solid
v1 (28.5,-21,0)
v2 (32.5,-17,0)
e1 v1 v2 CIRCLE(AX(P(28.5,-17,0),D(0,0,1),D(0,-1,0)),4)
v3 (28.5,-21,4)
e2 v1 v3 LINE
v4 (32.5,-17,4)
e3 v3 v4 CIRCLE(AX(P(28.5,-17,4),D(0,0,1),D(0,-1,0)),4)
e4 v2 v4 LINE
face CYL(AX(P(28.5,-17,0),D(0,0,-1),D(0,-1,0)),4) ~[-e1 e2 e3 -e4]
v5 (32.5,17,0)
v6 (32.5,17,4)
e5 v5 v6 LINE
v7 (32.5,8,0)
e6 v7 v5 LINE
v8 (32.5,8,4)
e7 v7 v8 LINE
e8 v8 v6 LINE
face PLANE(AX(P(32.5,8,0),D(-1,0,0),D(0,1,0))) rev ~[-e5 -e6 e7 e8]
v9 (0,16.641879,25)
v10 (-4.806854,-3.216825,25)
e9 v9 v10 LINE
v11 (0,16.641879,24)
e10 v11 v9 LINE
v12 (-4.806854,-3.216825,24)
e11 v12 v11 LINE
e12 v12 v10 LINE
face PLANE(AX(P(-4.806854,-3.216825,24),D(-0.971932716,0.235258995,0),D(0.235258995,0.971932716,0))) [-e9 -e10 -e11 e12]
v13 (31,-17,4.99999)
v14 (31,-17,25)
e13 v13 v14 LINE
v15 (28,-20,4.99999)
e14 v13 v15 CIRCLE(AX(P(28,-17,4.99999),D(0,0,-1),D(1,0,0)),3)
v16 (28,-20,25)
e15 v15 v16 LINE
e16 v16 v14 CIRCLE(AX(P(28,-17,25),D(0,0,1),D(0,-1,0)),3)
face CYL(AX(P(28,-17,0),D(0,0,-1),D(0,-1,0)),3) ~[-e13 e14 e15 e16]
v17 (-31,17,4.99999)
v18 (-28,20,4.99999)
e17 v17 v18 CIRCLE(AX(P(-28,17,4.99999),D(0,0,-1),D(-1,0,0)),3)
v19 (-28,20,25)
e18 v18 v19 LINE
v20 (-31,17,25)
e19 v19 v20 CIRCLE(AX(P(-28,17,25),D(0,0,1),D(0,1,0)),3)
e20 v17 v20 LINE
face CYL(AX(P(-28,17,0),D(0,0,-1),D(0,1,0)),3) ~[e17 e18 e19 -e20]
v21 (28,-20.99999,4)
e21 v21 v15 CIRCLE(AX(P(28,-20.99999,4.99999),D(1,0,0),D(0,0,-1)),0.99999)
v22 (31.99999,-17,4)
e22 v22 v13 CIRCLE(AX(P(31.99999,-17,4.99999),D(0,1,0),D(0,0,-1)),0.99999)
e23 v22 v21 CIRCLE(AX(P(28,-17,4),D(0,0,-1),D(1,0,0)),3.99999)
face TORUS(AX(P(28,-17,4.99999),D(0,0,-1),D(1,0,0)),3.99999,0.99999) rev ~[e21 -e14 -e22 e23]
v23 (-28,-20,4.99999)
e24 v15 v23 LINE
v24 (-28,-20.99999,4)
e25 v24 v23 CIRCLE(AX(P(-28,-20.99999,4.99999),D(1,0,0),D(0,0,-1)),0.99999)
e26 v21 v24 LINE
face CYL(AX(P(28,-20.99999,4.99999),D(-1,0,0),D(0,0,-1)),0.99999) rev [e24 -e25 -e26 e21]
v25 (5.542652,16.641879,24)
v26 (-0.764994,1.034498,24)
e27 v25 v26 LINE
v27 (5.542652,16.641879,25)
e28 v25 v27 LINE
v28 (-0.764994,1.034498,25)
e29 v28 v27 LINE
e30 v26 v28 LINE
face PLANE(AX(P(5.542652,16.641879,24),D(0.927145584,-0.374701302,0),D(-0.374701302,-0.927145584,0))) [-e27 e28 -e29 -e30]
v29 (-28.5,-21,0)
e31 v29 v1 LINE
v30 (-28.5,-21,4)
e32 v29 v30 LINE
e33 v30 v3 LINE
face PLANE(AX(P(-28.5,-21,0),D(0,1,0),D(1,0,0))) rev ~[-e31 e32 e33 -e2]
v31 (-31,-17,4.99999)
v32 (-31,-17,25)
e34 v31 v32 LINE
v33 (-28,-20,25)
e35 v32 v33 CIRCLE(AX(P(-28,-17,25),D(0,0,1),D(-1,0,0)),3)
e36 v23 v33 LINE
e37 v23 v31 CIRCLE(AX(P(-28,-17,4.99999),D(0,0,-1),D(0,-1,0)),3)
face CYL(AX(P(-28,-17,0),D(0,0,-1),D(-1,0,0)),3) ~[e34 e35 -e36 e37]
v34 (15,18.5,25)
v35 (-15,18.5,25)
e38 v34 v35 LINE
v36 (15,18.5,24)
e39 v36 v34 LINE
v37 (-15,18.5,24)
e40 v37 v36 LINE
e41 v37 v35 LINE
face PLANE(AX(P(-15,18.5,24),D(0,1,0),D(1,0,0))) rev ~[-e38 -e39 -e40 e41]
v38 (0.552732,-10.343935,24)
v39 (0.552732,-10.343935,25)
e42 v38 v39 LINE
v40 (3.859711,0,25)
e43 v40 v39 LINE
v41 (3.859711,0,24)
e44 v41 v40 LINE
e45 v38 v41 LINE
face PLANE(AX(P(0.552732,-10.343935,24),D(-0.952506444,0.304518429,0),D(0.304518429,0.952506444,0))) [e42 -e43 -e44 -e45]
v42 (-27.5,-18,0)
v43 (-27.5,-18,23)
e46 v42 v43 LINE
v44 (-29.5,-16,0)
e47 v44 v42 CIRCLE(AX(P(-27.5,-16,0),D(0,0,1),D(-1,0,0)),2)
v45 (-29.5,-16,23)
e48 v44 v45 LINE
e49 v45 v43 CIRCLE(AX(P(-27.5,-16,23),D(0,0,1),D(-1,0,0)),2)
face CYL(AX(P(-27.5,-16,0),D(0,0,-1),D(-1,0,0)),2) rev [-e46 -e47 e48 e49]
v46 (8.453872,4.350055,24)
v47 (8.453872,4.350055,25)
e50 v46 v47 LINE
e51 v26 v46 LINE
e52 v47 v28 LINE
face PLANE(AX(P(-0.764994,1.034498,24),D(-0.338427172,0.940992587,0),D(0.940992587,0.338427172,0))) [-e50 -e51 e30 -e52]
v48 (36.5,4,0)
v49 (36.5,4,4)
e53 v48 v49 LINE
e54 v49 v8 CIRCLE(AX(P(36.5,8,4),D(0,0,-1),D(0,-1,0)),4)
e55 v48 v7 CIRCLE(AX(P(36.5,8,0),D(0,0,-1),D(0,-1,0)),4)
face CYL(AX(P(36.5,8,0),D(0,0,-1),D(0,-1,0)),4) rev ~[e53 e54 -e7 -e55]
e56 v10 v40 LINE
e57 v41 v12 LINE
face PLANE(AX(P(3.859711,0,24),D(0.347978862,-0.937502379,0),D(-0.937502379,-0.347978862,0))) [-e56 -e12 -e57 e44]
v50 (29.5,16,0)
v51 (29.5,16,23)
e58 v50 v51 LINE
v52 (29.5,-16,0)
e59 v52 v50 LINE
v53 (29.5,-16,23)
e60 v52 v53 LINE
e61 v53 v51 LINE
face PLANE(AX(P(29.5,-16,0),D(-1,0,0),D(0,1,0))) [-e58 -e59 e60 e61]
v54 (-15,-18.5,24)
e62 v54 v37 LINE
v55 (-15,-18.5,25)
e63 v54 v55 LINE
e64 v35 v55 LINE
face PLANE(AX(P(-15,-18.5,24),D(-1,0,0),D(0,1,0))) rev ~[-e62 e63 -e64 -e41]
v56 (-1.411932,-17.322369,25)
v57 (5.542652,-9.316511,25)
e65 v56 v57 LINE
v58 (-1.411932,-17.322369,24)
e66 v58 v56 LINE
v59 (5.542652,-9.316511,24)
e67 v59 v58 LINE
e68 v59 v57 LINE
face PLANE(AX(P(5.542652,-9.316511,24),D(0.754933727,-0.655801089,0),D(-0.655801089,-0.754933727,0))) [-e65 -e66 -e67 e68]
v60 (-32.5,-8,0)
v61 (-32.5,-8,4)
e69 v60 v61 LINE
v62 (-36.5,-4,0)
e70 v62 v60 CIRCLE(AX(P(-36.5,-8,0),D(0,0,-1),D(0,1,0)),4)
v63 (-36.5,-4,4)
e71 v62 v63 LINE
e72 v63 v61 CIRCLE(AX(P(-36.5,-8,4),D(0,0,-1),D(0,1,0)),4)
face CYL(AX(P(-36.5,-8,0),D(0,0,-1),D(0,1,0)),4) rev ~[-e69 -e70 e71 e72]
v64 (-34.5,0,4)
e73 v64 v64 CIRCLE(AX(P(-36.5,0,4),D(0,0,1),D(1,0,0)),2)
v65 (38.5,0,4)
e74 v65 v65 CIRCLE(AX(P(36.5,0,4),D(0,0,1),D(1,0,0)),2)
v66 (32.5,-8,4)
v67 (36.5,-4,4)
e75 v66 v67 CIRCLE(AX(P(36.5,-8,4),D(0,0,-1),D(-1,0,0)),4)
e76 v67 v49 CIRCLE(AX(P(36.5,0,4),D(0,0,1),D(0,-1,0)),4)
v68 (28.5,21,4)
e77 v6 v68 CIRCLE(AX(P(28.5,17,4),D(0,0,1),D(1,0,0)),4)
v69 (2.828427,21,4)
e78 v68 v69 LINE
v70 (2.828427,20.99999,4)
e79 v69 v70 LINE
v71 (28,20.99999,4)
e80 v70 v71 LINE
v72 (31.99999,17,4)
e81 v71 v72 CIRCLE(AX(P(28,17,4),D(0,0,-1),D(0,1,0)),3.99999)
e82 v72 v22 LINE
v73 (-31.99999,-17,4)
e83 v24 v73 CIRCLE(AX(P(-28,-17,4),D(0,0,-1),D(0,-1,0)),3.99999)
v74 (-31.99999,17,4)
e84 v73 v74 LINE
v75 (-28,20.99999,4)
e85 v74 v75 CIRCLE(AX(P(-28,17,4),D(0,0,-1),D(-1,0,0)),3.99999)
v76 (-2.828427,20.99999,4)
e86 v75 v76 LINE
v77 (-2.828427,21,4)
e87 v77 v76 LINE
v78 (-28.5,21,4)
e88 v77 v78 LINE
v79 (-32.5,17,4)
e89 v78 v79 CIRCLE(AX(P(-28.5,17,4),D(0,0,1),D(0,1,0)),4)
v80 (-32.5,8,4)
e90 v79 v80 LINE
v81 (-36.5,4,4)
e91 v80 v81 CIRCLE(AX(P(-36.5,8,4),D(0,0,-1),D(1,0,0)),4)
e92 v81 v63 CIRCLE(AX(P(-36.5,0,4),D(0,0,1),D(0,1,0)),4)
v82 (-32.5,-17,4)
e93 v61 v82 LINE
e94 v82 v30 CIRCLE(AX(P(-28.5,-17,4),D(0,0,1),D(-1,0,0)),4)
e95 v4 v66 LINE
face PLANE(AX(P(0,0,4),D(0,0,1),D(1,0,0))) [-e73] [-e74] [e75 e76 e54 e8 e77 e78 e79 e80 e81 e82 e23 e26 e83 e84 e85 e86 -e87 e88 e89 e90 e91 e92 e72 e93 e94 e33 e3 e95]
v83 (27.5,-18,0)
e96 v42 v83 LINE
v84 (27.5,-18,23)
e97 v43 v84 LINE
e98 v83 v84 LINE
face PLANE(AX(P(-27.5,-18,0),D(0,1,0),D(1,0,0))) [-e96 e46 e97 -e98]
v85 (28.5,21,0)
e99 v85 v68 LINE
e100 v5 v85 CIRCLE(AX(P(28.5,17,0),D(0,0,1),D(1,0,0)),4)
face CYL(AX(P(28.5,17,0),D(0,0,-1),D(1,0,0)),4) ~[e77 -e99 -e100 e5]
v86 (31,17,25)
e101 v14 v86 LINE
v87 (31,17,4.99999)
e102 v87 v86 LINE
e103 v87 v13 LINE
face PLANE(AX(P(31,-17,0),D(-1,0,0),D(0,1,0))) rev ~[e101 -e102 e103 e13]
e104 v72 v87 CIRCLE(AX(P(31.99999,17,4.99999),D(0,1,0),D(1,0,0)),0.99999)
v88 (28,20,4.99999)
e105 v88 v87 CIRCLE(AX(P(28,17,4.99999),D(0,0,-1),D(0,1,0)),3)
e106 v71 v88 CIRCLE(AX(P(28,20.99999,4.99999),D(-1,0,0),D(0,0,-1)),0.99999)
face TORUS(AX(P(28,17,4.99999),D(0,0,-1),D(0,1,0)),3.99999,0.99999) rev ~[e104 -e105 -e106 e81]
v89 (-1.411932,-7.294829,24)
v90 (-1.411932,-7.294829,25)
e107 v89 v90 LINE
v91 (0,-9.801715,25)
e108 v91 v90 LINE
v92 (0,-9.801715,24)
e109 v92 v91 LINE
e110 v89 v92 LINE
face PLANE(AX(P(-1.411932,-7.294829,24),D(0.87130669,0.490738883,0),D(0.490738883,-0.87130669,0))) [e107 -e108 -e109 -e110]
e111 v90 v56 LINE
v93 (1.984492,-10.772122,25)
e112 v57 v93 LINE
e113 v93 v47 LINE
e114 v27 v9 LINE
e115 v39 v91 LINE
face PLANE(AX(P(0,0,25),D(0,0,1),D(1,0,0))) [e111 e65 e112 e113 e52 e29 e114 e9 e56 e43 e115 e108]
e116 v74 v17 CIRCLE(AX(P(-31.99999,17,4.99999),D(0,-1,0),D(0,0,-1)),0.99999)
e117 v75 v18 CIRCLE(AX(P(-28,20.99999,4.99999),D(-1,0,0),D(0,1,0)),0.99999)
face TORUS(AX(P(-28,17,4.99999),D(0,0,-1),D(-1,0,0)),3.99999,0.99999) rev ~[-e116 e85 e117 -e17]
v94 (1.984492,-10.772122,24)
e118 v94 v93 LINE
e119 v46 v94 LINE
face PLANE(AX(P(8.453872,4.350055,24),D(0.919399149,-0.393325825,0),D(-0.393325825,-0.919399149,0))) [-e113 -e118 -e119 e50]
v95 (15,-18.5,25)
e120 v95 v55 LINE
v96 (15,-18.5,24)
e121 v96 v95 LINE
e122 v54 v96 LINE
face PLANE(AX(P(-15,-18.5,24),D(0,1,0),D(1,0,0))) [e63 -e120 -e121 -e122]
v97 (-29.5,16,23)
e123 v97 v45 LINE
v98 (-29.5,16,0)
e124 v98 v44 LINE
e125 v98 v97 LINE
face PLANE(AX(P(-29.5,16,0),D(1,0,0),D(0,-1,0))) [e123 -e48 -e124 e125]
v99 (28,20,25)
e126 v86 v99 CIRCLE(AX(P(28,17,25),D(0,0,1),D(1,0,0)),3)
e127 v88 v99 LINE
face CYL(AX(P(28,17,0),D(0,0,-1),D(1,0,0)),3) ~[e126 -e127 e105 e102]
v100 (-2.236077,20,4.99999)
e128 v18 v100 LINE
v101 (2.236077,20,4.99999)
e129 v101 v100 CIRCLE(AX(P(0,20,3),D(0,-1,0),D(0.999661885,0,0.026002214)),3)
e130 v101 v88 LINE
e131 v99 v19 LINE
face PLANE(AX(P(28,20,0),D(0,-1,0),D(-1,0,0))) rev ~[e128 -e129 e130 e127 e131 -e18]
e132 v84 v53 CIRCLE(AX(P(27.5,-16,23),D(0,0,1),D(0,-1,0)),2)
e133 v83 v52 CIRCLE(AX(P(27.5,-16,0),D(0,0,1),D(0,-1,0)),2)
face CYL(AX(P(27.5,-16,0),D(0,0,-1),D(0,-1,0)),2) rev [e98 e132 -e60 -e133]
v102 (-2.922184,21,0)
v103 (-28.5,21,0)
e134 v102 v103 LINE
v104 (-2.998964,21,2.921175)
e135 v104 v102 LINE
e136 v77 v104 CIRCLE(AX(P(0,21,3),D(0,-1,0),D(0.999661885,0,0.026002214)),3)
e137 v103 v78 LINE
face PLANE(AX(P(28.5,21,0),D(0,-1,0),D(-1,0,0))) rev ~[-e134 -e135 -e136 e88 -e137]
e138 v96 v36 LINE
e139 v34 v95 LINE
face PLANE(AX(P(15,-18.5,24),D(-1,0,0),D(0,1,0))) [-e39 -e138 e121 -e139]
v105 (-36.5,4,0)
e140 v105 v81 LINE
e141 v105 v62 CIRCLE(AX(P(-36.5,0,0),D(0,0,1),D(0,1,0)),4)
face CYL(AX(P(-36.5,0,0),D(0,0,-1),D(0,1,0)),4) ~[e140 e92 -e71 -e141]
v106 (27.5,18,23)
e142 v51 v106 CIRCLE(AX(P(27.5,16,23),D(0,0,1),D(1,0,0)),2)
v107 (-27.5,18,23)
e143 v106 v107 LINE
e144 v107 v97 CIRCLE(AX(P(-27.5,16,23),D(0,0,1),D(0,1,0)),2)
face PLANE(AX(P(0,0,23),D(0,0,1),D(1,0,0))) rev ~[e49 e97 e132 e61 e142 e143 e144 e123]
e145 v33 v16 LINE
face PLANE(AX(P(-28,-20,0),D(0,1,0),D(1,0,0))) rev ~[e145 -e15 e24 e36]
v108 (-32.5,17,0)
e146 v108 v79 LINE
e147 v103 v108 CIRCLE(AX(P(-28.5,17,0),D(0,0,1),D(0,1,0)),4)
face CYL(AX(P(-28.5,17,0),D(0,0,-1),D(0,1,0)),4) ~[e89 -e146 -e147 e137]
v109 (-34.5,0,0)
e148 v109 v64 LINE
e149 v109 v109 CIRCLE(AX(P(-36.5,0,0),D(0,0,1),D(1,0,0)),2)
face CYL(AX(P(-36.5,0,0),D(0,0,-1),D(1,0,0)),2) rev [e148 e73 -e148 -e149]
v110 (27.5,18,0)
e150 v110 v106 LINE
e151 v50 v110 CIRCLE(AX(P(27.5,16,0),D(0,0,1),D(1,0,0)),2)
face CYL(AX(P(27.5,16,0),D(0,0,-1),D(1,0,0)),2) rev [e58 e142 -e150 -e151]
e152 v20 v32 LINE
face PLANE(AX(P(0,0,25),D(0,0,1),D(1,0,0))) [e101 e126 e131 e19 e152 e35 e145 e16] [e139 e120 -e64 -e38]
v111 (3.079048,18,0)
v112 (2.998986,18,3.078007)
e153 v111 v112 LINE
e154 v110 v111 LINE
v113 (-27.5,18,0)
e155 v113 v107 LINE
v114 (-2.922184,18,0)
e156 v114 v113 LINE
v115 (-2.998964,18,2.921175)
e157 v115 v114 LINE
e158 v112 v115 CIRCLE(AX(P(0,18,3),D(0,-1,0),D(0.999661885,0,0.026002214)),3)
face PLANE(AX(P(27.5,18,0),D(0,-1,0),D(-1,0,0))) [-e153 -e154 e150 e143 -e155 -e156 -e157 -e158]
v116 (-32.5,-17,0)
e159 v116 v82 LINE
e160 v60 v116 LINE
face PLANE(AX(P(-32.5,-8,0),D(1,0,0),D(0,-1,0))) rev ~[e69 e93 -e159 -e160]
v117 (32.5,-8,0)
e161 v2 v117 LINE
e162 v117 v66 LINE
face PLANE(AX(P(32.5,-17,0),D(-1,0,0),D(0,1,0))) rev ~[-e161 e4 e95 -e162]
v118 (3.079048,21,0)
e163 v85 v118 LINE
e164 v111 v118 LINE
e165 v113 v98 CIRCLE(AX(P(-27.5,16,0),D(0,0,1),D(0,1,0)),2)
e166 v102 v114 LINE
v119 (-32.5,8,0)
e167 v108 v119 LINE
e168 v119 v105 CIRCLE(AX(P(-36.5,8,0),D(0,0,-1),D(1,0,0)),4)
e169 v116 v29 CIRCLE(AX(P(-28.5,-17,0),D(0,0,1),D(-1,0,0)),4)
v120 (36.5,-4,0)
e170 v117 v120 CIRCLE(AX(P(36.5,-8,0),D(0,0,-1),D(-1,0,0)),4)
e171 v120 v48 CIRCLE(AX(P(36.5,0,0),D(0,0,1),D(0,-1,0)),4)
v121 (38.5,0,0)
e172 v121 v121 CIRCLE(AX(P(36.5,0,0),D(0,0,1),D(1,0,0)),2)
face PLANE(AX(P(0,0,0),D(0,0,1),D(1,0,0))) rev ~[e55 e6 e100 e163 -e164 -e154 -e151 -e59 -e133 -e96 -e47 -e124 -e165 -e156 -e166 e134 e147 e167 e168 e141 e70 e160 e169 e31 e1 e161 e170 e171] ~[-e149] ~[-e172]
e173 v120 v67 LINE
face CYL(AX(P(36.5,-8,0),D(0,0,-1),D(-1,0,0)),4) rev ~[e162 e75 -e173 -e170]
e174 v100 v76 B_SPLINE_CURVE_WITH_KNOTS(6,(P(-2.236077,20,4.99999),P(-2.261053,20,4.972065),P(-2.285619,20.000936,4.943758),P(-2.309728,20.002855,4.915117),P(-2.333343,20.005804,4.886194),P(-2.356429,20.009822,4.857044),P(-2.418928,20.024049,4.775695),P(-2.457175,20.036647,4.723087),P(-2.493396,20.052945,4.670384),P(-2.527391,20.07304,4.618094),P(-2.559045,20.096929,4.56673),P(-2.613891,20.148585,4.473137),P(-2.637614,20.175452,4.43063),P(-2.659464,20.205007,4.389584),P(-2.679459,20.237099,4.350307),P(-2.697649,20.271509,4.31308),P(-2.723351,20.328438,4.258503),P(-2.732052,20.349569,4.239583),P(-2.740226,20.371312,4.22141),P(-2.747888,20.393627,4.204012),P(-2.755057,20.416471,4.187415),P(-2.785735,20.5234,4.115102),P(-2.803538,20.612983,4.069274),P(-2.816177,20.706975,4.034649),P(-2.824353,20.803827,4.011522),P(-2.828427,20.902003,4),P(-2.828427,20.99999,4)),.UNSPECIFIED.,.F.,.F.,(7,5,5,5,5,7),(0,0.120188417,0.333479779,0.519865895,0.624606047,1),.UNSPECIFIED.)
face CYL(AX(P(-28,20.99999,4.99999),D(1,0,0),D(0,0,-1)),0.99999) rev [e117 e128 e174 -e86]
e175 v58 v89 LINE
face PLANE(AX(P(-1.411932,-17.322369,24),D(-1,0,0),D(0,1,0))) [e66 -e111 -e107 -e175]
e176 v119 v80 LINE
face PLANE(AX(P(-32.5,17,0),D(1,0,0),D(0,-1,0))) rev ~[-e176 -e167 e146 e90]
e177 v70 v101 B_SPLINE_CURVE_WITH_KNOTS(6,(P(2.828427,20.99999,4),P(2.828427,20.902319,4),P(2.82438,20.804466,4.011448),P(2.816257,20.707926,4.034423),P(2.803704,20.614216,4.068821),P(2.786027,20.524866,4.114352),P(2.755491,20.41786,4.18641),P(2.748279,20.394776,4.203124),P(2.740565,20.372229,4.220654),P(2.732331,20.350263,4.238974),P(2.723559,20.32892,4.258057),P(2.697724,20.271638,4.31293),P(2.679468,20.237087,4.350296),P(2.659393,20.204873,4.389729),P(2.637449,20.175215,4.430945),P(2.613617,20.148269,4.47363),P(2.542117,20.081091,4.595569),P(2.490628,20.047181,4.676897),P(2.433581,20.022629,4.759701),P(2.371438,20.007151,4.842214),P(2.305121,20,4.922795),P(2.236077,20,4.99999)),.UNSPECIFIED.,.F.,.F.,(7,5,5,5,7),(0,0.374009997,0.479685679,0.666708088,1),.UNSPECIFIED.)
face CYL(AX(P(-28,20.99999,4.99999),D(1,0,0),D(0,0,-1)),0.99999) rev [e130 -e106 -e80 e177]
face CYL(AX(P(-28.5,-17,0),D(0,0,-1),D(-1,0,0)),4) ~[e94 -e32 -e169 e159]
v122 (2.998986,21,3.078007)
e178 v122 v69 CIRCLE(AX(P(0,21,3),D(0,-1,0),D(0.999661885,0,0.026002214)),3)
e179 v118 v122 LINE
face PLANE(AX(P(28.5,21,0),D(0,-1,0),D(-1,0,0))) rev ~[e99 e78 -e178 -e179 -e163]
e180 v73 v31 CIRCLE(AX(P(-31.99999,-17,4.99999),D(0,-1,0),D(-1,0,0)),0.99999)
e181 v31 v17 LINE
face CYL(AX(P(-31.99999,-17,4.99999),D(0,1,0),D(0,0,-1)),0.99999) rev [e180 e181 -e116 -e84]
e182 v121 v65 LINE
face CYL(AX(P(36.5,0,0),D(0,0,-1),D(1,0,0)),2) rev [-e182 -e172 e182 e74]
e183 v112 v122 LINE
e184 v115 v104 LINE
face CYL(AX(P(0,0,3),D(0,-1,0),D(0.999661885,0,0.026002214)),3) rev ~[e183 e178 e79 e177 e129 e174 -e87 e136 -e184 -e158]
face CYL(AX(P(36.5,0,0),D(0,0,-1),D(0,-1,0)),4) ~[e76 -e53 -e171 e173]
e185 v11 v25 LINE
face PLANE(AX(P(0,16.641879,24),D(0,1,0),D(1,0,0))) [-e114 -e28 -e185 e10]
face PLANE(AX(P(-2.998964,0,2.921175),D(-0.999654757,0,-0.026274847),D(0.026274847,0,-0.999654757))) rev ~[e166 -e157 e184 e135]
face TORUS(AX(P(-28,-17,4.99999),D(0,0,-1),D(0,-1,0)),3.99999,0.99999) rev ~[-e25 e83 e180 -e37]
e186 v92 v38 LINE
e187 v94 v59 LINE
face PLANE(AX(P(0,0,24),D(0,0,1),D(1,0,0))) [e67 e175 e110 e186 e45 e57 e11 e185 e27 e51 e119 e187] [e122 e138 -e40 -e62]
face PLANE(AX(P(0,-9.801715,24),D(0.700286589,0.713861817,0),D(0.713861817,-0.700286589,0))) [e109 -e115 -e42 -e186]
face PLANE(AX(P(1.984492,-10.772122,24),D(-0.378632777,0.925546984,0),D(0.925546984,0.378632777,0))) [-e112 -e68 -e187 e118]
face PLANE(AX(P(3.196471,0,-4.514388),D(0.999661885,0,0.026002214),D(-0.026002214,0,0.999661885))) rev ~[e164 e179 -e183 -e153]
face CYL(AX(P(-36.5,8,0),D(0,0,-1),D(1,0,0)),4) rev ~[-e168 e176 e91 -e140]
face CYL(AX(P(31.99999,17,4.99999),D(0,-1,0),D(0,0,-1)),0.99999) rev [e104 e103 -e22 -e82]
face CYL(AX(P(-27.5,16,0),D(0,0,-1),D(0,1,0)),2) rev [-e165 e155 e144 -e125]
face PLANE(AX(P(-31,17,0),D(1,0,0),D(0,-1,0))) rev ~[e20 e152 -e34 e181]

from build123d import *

# Parameters (mm, degrees)
F0_R     = 2
F1_DEPTH = 4
F3_DEPTH = 25
F4_R     = 0.99999
F5_DEPTH = 23
F7_START = 24
F6_W     = 30
F6_H     = 37
F7_DEPTH = 6
F9_DEPTH = 25


# Not quite as in the source:
# - a fillet or chamfer is up to 0.001 mm smaller than in the source, because OpenCascade refuses the exact size


with BuildPart() as f1:
    # F0 (on Top) → F1 (new body)
    with BuildSketch(Plane.XY):
        with BuildLine():
            Line((28.5, 21), (-28.5, 21))
            ThreePointArc((-28.5, 21), (-31.3284271247, 19.8284271247), (-32.5, 17))
            Line((-32.5, 17), (-32.5, 8))
            ThreePointArc((-32.5, 8), (-33.6715728753, 5.1715728753), (-36.5, 4))
            ThreePointArc((-36.5, 4), (-40.5, 0), (-36.5, -4))
            ThreePointArc((-36.5, -4), (-33.6715728753, -5.1715728753), (-32.5, -8))
            Line((-32.5, -8), (-32.5, -17))
            ThreePointArc((-32.5, -17), (-31.3284271247, -19.8284271247), (-28.5, -21))
            Line((-28.5, -21), (28.5, -21))
            ThreePointArc((28.5, -21), (31.3284271247, -19.8284271247), (32.5, -17))
            Line((32.5, -17), (32.5, -8))
            ThreePointArc((32.5, -8), (33.6715728753, -5.1715728753), (36.5, -4))
            ThreePointArc((36.5, -4), (40.5, 0), (36.5, 4))
            ThreePointArc((36.5, 4), (33.6715728753, 5.1715728753), (32.5, 8))
            Line((32.5, 8), (32.5, 17))
            ThreePointArc((32.5, 17), (31.3284271247, 19.8284271247), (28.5, 21))
        make_face()
        with Locations((-36.5, 0)):
            Circle(F0_R, mode=Mode.SUBTRACT)
        with BuildLine():
            ThreePointArc((29.5, -16), (28.9142135624, -17.4142135624), (27.5, -18))
            Line((27.5, -18), (-27.5, -18))
            ThreePointArc((-27.5, -18), (-28.9142135624, -17.4142135624), (-29.5, -16))
            Line((-29.5, -16), (-29.5, 16))
            ThreePointArc((-29.5, 16), (-28.9142135624, 17.4142135624), (-27.5, 18))
            Line((-27.5, 18), (27.5, 18))
            ThreePointArc((27.5, 18), (28.9142135624, 17.4142135624), (29.5, 16))
            Line((29.5, 16), (29.5, -16))
        make_face(mode=Mode.SUBTRACT)
        with Locations((36.5, 0)):
            Circle(F0_R, mode=Mode.SUBTRACT)
    extrude(amount=F1_DEPTH)

    # F2 (on Top) → F3 (join)
    with BuildSketch(Plane.XY):
        with BuildLine():
            Line((28, 20), (-28, 20))
            ThreePointArc((-28, 20), (-30.1213203436, 19.1213203436), (-31, 17))
            Line((-31, 17), (-31, -17))
            ThreePointArc((-31, -17), (-30.1213203436, -19.1213203436), (-28, -20))
            Line((-28, -20), (28, -20))
            ThreePointArc((28, -20), (30.1213203436, -19.1213203436), (31, -17))
            Line((31, -17), (31, 17))
            ThreePointArc((31, 17), (30.1213203436, 19.1213203436), (28, 20))
        make_face()
    extrude(amount=F3_DEPTH)

    # F4 (radius 1 in the source; OpenCascade refuses exactly that, so slightly less here)
    f4_edges = [f1.edges().sort_by_distance(p)[0] for p in [
        (0, -20, 4),
        (30.12132, -19.12132, 4),
    ]]
    fillet(f4_edges, radius=F4_R)

    # F0 (on Top) → F5 (cut)
    with BuildSketch(Plane.XY):
        with BuildLine():
            Line((-27.5, -18), (27.5, -18))
            ThreePointArc((27.5, -18), (28.9142135624, -17.4142135624), (29.5, -16))
            Line((29.5, -16), (29.5, 16))
            ThreePointArc((29.5, 16), (28.9142135624, 17.4142135624), (27.5, 18))
            Line((27.5, 18), (-27.5, 18))
            ThreePointArc((-27.5, 18), (-28.9142135624, 17.4142135624), (-29.5, 16))
            Line((-29.5, 16), (-29.5, -16))
            ThreePointArc((-29.5, -16), (-28.9142135624, -17.4142135624), (-27.5, -18))
        make_face()
    extrude(amount=F5_DEPTH, mode=Mode.SUBTRACT)

    # F6 (on Top) → F7 (cut)
    with BuildSketch(Plane.XY.offset(F7_START)):
        Rectangle(F6_W, F6_H)
        Polygon((-4.8068542965, -3.2168254256), (0, 16.6418794543), (5.5426517501, 16.6418794543), (-0.7649944164, 1.0344976326), (8.4538720548, 4.3500550091), (1.9844917115, -10.7721220702), (5.5426517501, -9.3165114522), (-1.4119322877, -17.3223689198), (-1.4119322877, -7.2948294692), (0, -9.8017146811), (0.5527317408, -10.3439353406), (3.8597108796, 0), align=None, mode=Mode.SUBTRACT)
    extrude(amount=F7_DEPTH, mode=Mode.SUBTRACT)

    # F8 (on Front) → F9 (cut)
    with BuildSketch(Plane.XZ):
        with BuildLine():
            Line((3.1964714846, -4.5143875896), (2.9989856559, 3.0780066406))
            ThreePointArc((2.9989856559, 3.0780066406), (-0.0784155915, 5.9989749907), (-2.9989642698, 2.921175459))
            Line((-2.9989642698, 2.921175459), (-2.8035285154, -4.5143875896))
            Line((-2.8035285154, -4.5143875896), (3.1964714846, -4.5143875896))
        make_face()
    extrude(amount=-F9_DEPTH, mode=Mode.SUBTRACT)


solid = f1.part
